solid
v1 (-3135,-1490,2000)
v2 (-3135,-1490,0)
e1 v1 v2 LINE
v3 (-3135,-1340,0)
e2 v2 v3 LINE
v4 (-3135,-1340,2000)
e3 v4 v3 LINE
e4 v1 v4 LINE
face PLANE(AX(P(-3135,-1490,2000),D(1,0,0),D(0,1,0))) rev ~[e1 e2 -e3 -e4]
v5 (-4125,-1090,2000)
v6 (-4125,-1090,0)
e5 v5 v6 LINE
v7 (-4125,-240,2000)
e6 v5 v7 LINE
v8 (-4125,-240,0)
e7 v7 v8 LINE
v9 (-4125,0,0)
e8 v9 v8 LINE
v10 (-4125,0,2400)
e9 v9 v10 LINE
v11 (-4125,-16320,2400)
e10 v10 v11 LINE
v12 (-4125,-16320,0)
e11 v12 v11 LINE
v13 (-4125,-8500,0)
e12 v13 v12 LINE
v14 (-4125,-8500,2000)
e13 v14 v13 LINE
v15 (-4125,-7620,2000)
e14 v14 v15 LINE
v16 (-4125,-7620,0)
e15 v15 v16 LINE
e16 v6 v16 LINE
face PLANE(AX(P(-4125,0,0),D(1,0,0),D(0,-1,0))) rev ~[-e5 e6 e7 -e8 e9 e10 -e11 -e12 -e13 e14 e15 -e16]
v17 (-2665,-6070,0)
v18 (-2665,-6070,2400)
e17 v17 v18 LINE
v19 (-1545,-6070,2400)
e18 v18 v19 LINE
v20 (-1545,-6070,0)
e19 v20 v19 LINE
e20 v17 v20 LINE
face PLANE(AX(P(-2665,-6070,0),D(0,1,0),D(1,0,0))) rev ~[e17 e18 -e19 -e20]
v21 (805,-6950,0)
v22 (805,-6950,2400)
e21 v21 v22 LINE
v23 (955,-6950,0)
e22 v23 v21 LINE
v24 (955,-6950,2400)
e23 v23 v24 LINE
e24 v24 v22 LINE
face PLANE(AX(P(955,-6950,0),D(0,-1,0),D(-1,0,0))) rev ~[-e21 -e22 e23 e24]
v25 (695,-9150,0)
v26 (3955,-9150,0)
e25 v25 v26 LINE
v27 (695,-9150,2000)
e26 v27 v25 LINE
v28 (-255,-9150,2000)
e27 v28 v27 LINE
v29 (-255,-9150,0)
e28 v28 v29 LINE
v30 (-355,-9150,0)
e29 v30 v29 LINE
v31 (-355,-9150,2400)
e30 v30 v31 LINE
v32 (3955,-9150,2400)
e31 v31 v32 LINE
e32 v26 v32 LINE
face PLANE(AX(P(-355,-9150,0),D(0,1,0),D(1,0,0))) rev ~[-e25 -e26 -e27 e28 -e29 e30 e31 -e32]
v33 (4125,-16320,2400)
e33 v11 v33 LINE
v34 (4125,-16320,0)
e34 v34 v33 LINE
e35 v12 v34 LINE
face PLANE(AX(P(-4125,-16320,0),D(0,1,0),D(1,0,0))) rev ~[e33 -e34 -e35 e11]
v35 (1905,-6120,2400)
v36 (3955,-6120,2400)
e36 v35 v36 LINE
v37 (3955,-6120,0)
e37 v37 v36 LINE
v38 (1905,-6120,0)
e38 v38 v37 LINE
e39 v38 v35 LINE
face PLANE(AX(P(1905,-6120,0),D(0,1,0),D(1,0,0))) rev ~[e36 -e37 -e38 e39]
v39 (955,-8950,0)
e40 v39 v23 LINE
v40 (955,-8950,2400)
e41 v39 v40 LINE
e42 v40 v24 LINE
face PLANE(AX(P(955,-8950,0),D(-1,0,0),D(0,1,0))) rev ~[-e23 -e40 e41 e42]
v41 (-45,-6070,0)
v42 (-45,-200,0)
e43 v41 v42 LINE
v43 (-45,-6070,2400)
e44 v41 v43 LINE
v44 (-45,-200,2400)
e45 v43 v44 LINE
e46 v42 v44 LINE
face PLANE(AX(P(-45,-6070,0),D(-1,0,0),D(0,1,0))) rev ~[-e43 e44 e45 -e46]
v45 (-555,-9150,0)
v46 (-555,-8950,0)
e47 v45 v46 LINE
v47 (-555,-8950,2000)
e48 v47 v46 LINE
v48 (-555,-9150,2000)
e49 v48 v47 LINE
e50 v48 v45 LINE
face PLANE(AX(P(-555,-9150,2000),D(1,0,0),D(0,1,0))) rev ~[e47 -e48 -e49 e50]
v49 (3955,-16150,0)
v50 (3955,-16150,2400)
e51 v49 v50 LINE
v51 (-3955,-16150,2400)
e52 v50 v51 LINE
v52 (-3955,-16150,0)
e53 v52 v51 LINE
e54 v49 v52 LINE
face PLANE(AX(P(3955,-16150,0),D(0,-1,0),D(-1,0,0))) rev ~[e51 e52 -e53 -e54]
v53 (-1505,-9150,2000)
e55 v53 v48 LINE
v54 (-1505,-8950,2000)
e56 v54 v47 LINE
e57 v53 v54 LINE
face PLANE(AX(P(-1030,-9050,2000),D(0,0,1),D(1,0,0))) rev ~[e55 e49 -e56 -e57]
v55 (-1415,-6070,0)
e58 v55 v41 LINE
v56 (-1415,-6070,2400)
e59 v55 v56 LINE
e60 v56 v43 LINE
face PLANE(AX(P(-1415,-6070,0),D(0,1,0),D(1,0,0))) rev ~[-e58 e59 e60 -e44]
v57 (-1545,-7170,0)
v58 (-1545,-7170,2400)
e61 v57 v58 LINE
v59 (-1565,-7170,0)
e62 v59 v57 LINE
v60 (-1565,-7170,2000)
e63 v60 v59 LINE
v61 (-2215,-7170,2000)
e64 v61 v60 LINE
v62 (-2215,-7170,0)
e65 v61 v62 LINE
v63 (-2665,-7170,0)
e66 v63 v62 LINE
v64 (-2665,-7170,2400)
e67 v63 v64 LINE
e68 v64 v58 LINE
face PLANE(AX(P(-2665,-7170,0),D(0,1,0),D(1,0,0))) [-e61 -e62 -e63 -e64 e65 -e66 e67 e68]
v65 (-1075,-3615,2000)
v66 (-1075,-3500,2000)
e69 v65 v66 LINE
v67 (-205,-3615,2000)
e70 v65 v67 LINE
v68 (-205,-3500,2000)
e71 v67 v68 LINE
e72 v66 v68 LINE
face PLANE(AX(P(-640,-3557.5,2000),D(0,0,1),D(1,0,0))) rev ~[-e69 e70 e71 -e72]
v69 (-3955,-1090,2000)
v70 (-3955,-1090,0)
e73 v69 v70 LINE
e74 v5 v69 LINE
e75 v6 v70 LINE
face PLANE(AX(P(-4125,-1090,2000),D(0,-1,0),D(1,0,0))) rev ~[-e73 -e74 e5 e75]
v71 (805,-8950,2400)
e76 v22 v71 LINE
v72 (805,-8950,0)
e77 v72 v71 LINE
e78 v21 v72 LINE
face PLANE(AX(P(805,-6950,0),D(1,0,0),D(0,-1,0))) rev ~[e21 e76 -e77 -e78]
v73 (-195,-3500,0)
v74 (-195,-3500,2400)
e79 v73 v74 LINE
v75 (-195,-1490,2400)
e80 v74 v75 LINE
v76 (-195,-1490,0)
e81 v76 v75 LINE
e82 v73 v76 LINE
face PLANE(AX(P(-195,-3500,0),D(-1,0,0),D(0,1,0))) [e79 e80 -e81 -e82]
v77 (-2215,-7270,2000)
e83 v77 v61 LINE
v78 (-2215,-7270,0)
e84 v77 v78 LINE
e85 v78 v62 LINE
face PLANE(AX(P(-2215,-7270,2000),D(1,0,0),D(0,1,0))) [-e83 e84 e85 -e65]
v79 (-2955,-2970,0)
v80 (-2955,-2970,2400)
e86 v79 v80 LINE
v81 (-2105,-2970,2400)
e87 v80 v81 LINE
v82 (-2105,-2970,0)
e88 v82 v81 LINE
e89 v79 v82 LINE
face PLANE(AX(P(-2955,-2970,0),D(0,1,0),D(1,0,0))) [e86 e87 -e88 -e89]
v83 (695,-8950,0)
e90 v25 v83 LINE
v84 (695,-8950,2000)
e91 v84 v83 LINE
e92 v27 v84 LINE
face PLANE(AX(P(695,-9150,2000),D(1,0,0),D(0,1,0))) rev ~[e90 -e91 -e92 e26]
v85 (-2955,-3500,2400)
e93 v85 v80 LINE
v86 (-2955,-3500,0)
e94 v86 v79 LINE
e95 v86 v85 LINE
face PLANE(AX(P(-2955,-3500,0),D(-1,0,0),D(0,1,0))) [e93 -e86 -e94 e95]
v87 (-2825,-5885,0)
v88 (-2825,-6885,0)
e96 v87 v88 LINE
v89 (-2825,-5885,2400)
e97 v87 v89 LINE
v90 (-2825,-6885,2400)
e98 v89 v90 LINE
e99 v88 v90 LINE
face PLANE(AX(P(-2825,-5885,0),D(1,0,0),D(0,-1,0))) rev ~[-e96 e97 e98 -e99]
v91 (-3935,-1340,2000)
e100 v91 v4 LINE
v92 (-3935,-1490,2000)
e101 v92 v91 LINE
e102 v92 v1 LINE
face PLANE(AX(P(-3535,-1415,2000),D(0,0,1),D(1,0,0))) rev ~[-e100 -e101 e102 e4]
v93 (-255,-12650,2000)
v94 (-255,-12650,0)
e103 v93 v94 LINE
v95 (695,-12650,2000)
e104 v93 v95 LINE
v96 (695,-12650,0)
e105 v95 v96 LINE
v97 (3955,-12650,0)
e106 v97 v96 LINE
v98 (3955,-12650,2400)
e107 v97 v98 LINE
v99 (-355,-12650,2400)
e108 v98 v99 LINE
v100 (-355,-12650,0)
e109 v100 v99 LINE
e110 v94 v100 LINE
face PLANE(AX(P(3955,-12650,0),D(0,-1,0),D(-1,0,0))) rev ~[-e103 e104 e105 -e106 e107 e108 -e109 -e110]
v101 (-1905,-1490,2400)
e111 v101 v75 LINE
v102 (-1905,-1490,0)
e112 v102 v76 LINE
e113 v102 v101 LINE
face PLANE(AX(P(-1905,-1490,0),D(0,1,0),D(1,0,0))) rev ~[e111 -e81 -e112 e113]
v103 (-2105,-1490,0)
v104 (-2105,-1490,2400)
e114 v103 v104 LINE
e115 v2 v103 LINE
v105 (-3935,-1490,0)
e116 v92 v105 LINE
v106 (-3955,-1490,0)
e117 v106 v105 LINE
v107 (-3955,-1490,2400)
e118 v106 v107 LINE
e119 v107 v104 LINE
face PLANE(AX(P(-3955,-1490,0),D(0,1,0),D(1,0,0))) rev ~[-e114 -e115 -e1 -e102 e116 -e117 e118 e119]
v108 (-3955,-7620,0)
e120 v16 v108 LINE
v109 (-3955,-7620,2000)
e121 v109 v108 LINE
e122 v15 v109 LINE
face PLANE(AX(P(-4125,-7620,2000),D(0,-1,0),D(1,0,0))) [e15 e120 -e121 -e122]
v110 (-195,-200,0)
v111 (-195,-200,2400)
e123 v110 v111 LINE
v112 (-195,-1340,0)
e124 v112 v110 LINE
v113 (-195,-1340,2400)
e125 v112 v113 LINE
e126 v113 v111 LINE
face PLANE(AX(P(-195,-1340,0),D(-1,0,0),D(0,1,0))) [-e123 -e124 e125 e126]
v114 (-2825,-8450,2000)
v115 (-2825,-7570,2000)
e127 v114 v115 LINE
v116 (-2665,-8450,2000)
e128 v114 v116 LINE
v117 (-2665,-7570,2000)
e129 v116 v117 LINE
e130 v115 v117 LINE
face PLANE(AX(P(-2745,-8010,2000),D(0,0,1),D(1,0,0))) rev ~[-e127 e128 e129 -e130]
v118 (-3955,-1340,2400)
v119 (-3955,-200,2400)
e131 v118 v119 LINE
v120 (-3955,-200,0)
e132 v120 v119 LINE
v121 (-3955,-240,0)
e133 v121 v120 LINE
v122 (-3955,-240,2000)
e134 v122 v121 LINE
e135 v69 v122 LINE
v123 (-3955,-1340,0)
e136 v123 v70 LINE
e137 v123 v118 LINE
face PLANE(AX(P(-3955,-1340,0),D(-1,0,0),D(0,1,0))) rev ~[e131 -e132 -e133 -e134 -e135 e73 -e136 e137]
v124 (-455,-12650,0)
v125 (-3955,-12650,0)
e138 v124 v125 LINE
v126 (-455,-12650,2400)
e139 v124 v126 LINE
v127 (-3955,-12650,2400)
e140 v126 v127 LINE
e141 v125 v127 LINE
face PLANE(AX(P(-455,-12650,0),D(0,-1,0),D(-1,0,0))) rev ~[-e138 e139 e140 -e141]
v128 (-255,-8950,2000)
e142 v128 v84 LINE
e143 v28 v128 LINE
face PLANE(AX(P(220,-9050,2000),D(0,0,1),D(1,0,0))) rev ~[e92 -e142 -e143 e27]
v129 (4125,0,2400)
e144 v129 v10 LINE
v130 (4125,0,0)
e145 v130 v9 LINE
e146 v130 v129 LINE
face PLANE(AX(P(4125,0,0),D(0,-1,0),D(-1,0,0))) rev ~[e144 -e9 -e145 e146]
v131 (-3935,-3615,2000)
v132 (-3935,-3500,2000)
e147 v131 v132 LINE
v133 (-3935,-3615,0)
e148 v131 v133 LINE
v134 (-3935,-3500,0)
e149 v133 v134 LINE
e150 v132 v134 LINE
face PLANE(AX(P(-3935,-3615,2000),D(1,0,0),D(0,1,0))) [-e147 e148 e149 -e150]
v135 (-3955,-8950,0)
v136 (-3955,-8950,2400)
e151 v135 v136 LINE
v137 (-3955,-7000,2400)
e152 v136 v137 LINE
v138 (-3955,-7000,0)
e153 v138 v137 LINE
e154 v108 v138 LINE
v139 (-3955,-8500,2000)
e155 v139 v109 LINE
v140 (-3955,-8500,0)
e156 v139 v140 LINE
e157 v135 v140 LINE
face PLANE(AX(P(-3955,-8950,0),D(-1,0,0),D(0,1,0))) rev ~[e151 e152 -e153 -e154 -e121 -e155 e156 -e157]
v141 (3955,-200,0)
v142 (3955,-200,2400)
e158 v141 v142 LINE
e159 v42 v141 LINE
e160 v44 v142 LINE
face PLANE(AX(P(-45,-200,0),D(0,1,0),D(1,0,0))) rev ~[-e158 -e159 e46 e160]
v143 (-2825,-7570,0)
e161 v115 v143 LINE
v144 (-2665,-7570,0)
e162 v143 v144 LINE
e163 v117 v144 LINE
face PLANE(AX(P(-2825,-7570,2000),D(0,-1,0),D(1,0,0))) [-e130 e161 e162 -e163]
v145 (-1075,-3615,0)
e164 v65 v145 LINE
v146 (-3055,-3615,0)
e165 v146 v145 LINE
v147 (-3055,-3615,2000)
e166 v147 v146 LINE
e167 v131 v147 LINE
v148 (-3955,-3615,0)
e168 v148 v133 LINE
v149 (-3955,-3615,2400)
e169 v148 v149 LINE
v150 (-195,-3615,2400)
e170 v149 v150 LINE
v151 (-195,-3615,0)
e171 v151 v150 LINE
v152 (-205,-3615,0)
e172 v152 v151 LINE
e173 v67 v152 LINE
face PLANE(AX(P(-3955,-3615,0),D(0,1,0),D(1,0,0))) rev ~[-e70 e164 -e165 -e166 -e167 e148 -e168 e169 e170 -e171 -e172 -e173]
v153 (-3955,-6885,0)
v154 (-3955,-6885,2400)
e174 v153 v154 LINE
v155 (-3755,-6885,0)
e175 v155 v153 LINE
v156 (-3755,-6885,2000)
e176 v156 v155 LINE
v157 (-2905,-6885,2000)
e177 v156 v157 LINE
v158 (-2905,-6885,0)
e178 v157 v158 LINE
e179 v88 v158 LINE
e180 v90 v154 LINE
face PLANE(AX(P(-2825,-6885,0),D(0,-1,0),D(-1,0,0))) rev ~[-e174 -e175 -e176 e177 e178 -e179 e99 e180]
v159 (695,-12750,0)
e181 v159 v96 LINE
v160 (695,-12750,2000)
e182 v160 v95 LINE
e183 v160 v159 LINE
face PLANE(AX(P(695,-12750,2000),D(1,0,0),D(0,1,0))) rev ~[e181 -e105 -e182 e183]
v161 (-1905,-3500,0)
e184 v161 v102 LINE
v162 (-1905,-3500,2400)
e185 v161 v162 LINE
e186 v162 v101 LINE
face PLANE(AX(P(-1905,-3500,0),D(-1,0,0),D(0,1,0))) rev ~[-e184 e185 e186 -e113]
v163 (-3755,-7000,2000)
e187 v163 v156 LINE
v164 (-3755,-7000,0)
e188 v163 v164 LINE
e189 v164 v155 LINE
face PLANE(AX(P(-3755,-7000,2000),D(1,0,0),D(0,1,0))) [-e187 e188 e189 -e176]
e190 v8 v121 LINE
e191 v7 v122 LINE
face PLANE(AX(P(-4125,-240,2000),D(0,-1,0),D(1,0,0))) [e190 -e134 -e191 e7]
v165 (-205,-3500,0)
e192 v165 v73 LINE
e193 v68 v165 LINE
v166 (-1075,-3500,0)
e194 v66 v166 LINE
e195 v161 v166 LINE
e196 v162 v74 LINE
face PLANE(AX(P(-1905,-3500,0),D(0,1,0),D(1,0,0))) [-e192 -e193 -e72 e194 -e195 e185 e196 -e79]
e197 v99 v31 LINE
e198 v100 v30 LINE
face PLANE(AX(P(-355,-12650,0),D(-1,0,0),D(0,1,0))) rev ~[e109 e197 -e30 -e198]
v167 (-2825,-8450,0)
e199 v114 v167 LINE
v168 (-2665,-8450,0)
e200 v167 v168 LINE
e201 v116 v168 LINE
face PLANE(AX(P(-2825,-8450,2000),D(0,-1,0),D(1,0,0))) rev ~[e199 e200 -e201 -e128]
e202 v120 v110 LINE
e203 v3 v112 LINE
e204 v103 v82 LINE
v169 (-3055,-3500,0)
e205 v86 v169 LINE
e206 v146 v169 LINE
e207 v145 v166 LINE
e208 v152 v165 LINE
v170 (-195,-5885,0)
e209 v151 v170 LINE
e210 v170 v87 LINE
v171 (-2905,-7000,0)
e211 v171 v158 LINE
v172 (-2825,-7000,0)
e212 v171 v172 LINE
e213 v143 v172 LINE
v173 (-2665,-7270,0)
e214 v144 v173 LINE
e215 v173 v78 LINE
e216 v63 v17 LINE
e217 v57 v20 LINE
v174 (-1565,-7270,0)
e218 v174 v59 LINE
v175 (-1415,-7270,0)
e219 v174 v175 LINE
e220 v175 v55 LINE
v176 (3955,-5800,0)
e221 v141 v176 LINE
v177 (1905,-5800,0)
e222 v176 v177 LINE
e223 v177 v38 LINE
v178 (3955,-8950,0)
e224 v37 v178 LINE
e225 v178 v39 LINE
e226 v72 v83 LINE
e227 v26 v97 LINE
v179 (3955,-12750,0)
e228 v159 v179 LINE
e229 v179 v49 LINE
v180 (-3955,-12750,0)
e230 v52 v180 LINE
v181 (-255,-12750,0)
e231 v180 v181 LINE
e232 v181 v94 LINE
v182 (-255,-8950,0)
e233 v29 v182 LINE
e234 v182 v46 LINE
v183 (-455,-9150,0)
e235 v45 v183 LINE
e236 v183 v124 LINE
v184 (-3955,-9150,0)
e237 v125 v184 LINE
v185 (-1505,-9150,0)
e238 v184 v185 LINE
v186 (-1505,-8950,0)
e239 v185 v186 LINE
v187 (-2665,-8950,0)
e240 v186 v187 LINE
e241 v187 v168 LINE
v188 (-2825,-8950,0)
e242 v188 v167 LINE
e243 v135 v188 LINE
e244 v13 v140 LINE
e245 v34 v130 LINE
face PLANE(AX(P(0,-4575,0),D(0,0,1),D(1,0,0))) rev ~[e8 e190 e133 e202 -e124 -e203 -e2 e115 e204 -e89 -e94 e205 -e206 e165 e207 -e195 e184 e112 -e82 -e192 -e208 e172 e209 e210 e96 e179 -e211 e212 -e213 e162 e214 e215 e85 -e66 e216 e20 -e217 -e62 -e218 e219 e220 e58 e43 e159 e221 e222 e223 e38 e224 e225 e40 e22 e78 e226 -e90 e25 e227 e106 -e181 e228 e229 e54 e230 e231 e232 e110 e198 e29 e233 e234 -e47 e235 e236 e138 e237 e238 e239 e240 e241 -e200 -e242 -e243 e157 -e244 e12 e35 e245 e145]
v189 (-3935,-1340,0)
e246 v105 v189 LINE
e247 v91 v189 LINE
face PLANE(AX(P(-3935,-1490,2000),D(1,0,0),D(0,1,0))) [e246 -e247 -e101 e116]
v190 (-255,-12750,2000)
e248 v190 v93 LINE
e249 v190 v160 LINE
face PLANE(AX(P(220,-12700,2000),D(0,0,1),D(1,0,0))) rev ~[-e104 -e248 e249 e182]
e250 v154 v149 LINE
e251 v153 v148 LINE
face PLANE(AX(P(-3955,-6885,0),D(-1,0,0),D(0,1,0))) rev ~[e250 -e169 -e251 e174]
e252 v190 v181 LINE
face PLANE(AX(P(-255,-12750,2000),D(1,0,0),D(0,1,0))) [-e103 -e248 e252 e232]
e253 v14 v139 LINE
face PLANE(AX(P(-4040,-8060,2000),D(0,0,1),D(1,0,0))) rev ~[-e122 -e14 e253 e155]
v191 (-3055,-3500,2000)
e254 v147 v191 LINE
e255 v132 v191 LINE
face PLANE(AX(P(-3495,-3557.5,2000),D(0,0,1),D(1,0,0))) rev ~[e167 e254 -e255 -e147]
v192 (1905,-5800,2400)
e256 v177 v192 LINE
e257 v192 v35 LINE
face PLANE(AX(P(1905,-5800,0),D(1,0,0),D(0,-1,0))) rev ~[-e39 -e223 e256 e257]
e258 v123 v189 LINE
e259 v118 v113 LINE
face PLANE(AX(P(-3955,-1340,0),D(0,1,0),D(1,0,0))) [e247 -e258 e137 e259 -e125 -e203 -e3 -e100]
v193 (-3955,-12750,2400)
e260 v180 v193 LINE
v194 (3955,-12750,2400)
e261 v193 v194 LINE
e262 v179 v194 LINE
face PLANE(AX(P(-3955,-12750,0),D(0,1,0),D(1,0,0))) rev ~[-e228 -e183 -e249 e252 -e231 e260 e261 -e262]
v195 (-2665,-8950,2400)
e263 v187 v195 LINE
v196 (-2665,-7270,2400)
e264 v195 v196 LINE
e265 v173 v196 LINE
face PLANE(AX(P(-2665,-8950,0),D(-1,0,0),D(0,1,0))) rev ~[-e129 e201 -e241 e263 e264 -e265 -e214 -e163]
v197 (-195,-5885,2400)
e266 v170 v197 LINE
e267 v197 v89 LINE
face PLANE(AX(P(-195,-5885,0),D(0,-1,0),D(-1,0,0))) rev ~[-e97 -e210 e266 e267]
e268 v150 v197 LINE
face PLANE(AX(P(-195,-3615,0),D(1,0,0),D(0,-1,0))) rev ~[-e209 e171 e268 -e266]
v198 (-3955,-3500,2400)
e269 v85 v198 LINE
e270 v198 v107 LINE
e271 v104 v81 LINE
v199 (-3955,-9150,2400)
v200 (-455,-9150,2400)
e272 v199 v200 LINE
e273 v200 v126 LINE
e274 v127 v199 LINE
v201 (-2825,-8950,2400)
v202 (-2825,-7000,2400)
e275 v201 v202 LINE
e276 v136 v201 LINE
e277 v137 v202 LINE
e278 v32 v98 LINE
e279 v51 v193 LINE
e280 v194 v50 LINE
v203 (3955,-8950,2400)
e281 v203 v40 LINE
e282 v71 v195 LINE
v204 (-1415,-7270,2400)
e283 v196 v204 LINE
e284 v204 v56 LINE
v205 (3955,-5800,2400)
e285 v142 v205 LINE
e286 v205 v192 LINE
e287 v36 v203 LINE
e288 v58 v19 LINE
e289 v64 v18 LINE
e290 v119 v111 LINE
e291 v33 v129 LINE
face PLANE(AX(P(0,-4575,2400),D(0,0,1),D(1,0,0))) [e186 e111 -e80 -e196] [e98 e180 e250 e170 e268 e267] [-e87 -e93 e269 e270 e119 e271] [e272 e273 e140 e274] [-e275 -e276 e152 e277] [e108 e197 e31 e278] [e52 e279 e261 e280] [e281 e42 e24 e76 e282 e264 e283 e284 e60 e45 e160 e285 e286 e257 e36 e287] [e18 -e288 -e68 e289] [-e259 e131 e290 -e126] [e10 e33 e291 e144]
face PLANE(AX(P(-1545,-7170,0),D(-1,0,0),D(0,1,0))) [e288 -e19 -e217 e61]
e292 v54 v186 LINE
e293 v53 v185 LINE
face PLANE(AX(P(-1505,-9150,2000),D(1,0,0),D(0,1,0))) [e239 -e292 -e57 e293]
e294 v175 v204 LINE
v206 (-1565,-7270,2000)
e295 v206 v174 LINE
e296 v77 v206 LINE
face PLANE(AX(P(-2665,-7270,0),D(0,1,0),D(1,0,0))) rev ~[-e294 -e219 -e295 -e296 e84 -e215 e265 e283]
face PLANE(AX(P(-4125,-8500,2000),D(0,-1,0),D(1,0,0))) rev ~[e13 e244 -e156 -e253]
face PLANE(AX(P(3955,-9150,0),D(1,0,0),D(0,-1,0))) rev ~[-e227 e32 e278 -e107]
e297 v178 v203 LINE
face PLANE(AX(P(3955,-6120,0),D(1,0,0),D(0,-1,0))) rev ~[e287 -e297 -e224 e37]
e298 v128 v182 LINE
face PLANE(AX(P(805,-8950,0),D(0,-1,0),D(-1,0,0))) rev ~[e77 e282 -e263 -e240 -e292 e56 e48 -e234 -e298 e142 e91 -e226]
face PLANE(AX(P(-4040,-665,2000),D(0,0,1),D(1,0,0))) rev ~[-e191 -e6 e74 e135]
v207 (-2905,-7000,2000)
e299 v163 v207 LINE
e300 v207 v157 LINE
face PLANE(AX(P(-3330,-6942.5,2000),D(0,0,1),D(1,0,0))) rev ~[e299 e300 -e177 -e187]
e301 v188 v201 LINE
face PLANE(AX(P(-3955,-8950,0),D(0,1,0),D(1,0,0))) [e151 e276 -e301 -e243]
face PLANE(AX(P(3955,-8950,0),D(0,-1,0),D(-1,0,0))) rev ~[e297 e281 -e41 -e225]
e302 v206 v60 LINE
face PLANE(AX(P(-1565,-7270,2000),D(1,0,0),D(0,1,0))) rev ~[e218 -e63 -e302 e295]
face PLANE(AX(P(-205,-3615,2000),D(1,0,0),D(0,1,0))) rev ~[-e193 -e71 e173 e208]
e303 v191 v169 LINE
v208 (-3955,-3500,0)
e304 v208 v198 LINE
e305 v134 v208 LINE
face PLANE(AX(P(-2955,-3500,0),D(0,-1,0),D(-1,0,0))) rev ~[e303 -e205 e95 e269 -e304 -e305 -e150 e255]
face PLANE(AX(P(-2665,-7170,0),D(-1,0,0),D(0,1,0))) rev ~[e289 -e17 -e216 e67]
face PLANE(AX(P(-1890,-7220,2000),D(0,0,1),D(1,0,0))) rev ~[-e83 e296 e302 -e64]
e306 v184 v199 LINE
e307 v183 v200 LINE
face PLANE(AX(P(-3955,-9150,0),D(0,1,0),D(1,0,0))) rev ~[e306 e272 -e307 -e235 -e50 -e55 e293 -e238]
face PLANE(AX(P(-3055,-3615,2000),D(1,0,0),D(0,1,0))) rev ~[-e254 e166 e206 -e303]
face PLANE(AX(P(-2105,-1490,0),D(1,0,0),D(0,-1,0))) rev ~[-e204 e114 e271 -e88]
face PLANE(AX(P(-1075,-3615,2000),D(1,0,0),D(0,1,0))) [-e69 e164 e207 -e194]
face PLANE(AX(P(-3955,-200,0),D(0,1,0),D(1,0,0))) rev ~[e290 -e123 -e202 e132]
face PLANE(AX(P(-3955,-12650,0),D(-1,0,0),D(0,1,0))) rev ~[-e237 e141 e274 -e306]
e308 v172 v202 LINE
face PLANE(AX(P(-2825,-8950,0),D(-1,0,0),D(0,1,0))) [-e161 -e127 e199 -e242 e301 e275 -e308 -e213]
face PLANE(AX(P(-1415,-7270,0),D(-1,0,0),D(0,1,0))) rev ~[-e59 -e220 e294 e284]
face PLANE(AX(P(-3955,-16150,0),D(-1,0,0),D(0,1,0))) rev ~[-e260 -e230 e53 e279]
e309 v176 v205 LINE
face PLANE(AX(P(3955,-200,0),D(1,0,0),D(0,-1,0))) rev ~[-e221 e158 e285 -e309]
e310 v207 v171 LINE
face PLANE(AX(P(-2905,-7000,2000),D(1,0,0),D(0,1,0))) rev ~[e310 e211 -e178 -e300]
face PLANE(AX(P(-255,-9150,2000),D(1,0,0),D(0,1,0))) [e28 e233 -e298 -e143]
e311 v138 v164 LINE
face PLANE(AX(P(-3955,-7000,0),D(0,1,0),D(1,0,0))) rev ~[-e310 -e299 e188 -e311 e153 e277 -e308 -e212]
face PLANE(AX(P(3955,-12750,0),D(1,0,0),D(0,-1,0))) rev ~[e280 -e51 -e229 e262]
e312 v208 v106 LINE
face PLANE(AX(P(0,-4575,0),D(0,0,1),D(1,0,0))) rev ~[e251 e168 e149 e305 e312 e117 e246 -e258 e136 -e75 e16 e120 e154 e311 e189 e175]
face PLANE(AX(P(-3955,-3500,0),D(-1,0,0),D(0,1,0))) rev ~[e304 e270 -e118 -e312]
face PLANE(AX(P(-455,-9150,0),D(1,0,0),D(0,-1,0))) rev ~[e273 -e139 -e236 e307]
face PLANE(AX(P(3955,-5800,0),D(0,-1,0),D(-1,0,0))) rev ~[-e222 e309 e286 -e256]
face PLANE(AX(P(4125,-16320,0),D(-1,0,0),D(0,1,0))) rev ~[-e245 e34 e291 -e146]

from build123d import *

# Parameters (mm, degrees)
F0_W     = 1130
F0_H     = 1950
F0_W_2   = 1120
F0_H_2   = 1100
F0_W_3   = 3760
F0_H_3   = 1140
F0_W_4   = 1710
F0_H_4   = 2010
F0_W_5   = 850
F0_H_5   = 530
F1_DEPTH = 2400
F3_START = -400
F2_W     = 170
F2_H     = 850
F2_W_2   = 800
F2_H_2   = 150
F2_W_3   = 880
F2_H_3   = 115
F2_W_4   = 870
F2_W_5   = 850
F2_H_4   = 880
F2_W_6   = 650
F2_H_5   = 100
F2_W_7   = 160
F2_W_8   = 950
F2_H_6   = 200
F3_DEPTH = 2000


# Not quite as in the source:
# - a feature names something its author has since deleted; it is built from what else it names


with BuildPart() as f1:
    # F0 (on Top) → F1 (new body)
    with BuildSketch(Plane.XY):
        Polygon((4125, 0), (-4125, 0), (-4125, -9150), (-3955, -9150), (-455, -9150), (-355, -9150), (3955, -9150), (4125, -9150), align=None)
        with Locations((-3390, -7975)):
            Rectangle(F0_W, F0_H, mode=Mode.SUBTRACT)
        with Locations((-2105, -6620)):
            Rectangle(F0_W_2, F0_H_2, mode=Mode.SUBTRACT)
        Polygon((-3955, -5885), (-3955, -3615), (-195, -3615), (-195, -5885), (-2825, -5885), (-2825, -6885), (-3955, -6885), align=None, mode=Mode.SUBTRACT)
        Polygon((-3955, -3500), (-3955, -1490), (-2105, -1490), (-2105, -2970), (-2105, -3500), (-2955, -3500), align=None, mode=Mode.SUBTRACT)
        with Locations((-2075, -770)):
            Rectangle(F0_W_3, F0_H_3, mode=Mode.SUBTRACT)
        with Locations((-1050, -2495)):
            Rectangle(F0_W_4, F0_H_4, mode=Mode.SUBTRACT)
        Polygon((-45, -6070), (-45, -200), (3955, -200), (3955, -5800), (1905, -5800), (1905, -6120), (3955, -6120), (3955, -8950), (955, -8950), (955, -6950), (805, -6950), (805, -8950), (-2665, -8950), (-2665, -7270), (-1415, -7270), (-1415, -6070), align=None, mode=Mode.SUBTRACT)
        with Locations((-2530, -3235)):
            Rectangle(F0_W_5, F0_H_5)
        Polygon((-355, -9150), (-455, -9150), (-455, -12650), (-3955, -12650), (-3955, -12750), (-355, -12750), (3955, -12750), (3955, -12650), (-355, -12650), align=None)
        Polygon((-3955, -9150), (-4125, -9150), (-4125, -16320), (4125, -16320), (4125, -9150), (3955, -9150), (3955, -12650), (3955, -12750), (3955, -16150), (-3955, -16150), (-3955, -12750), (-3955, -12650), align=None)
    extrude(amount=F1_DEPTH)

    # F2 (on face) → F3 (cut)
    with BuildSketch(Plane.XY.offset(2400).offset(F3_START)):
        with Locations((-4040, -665)):
            Rectangle(F2_W, F2_H)
        with Locations((-3535, -1415)):
            Rectangle(F2_W_2, F2_H_2)
        with Locations((-3495, -3557.5)):
            Rectangle(F2_W_3, F2_H_3)
        with Locations((-640, -3557.5)):
            Rectangle(F2_W_4, F2_H_3)
        with Locations((-3330, -6942.5)):
            Rectangle(F2_W_5, F2_H_3)
        with Locations((-4040, -8060)):
            Rectangle(F2_W, F2_H_4)
        with Locations((-1890, -7220)):
            Rectangle(F2_W_6, F2_H_5)
        with Locations((-2745, -8010)):
            Rectangle(F2_W_7, F2_H_4)
        with Locations((-1030, -9050)):
            Rectangle(F2_W_8, F2_H_6)
        with Locations((220, -9050)):
            Rectangle(F2_W_8, F2_H_6)
        with Locations((220, -12700)):
            Rectangle(F2_W_8, F2_H_5)
    extrude(amount=-F3_DEPTH, mode=Mode.SUBTRACT)


solid = f1.part
